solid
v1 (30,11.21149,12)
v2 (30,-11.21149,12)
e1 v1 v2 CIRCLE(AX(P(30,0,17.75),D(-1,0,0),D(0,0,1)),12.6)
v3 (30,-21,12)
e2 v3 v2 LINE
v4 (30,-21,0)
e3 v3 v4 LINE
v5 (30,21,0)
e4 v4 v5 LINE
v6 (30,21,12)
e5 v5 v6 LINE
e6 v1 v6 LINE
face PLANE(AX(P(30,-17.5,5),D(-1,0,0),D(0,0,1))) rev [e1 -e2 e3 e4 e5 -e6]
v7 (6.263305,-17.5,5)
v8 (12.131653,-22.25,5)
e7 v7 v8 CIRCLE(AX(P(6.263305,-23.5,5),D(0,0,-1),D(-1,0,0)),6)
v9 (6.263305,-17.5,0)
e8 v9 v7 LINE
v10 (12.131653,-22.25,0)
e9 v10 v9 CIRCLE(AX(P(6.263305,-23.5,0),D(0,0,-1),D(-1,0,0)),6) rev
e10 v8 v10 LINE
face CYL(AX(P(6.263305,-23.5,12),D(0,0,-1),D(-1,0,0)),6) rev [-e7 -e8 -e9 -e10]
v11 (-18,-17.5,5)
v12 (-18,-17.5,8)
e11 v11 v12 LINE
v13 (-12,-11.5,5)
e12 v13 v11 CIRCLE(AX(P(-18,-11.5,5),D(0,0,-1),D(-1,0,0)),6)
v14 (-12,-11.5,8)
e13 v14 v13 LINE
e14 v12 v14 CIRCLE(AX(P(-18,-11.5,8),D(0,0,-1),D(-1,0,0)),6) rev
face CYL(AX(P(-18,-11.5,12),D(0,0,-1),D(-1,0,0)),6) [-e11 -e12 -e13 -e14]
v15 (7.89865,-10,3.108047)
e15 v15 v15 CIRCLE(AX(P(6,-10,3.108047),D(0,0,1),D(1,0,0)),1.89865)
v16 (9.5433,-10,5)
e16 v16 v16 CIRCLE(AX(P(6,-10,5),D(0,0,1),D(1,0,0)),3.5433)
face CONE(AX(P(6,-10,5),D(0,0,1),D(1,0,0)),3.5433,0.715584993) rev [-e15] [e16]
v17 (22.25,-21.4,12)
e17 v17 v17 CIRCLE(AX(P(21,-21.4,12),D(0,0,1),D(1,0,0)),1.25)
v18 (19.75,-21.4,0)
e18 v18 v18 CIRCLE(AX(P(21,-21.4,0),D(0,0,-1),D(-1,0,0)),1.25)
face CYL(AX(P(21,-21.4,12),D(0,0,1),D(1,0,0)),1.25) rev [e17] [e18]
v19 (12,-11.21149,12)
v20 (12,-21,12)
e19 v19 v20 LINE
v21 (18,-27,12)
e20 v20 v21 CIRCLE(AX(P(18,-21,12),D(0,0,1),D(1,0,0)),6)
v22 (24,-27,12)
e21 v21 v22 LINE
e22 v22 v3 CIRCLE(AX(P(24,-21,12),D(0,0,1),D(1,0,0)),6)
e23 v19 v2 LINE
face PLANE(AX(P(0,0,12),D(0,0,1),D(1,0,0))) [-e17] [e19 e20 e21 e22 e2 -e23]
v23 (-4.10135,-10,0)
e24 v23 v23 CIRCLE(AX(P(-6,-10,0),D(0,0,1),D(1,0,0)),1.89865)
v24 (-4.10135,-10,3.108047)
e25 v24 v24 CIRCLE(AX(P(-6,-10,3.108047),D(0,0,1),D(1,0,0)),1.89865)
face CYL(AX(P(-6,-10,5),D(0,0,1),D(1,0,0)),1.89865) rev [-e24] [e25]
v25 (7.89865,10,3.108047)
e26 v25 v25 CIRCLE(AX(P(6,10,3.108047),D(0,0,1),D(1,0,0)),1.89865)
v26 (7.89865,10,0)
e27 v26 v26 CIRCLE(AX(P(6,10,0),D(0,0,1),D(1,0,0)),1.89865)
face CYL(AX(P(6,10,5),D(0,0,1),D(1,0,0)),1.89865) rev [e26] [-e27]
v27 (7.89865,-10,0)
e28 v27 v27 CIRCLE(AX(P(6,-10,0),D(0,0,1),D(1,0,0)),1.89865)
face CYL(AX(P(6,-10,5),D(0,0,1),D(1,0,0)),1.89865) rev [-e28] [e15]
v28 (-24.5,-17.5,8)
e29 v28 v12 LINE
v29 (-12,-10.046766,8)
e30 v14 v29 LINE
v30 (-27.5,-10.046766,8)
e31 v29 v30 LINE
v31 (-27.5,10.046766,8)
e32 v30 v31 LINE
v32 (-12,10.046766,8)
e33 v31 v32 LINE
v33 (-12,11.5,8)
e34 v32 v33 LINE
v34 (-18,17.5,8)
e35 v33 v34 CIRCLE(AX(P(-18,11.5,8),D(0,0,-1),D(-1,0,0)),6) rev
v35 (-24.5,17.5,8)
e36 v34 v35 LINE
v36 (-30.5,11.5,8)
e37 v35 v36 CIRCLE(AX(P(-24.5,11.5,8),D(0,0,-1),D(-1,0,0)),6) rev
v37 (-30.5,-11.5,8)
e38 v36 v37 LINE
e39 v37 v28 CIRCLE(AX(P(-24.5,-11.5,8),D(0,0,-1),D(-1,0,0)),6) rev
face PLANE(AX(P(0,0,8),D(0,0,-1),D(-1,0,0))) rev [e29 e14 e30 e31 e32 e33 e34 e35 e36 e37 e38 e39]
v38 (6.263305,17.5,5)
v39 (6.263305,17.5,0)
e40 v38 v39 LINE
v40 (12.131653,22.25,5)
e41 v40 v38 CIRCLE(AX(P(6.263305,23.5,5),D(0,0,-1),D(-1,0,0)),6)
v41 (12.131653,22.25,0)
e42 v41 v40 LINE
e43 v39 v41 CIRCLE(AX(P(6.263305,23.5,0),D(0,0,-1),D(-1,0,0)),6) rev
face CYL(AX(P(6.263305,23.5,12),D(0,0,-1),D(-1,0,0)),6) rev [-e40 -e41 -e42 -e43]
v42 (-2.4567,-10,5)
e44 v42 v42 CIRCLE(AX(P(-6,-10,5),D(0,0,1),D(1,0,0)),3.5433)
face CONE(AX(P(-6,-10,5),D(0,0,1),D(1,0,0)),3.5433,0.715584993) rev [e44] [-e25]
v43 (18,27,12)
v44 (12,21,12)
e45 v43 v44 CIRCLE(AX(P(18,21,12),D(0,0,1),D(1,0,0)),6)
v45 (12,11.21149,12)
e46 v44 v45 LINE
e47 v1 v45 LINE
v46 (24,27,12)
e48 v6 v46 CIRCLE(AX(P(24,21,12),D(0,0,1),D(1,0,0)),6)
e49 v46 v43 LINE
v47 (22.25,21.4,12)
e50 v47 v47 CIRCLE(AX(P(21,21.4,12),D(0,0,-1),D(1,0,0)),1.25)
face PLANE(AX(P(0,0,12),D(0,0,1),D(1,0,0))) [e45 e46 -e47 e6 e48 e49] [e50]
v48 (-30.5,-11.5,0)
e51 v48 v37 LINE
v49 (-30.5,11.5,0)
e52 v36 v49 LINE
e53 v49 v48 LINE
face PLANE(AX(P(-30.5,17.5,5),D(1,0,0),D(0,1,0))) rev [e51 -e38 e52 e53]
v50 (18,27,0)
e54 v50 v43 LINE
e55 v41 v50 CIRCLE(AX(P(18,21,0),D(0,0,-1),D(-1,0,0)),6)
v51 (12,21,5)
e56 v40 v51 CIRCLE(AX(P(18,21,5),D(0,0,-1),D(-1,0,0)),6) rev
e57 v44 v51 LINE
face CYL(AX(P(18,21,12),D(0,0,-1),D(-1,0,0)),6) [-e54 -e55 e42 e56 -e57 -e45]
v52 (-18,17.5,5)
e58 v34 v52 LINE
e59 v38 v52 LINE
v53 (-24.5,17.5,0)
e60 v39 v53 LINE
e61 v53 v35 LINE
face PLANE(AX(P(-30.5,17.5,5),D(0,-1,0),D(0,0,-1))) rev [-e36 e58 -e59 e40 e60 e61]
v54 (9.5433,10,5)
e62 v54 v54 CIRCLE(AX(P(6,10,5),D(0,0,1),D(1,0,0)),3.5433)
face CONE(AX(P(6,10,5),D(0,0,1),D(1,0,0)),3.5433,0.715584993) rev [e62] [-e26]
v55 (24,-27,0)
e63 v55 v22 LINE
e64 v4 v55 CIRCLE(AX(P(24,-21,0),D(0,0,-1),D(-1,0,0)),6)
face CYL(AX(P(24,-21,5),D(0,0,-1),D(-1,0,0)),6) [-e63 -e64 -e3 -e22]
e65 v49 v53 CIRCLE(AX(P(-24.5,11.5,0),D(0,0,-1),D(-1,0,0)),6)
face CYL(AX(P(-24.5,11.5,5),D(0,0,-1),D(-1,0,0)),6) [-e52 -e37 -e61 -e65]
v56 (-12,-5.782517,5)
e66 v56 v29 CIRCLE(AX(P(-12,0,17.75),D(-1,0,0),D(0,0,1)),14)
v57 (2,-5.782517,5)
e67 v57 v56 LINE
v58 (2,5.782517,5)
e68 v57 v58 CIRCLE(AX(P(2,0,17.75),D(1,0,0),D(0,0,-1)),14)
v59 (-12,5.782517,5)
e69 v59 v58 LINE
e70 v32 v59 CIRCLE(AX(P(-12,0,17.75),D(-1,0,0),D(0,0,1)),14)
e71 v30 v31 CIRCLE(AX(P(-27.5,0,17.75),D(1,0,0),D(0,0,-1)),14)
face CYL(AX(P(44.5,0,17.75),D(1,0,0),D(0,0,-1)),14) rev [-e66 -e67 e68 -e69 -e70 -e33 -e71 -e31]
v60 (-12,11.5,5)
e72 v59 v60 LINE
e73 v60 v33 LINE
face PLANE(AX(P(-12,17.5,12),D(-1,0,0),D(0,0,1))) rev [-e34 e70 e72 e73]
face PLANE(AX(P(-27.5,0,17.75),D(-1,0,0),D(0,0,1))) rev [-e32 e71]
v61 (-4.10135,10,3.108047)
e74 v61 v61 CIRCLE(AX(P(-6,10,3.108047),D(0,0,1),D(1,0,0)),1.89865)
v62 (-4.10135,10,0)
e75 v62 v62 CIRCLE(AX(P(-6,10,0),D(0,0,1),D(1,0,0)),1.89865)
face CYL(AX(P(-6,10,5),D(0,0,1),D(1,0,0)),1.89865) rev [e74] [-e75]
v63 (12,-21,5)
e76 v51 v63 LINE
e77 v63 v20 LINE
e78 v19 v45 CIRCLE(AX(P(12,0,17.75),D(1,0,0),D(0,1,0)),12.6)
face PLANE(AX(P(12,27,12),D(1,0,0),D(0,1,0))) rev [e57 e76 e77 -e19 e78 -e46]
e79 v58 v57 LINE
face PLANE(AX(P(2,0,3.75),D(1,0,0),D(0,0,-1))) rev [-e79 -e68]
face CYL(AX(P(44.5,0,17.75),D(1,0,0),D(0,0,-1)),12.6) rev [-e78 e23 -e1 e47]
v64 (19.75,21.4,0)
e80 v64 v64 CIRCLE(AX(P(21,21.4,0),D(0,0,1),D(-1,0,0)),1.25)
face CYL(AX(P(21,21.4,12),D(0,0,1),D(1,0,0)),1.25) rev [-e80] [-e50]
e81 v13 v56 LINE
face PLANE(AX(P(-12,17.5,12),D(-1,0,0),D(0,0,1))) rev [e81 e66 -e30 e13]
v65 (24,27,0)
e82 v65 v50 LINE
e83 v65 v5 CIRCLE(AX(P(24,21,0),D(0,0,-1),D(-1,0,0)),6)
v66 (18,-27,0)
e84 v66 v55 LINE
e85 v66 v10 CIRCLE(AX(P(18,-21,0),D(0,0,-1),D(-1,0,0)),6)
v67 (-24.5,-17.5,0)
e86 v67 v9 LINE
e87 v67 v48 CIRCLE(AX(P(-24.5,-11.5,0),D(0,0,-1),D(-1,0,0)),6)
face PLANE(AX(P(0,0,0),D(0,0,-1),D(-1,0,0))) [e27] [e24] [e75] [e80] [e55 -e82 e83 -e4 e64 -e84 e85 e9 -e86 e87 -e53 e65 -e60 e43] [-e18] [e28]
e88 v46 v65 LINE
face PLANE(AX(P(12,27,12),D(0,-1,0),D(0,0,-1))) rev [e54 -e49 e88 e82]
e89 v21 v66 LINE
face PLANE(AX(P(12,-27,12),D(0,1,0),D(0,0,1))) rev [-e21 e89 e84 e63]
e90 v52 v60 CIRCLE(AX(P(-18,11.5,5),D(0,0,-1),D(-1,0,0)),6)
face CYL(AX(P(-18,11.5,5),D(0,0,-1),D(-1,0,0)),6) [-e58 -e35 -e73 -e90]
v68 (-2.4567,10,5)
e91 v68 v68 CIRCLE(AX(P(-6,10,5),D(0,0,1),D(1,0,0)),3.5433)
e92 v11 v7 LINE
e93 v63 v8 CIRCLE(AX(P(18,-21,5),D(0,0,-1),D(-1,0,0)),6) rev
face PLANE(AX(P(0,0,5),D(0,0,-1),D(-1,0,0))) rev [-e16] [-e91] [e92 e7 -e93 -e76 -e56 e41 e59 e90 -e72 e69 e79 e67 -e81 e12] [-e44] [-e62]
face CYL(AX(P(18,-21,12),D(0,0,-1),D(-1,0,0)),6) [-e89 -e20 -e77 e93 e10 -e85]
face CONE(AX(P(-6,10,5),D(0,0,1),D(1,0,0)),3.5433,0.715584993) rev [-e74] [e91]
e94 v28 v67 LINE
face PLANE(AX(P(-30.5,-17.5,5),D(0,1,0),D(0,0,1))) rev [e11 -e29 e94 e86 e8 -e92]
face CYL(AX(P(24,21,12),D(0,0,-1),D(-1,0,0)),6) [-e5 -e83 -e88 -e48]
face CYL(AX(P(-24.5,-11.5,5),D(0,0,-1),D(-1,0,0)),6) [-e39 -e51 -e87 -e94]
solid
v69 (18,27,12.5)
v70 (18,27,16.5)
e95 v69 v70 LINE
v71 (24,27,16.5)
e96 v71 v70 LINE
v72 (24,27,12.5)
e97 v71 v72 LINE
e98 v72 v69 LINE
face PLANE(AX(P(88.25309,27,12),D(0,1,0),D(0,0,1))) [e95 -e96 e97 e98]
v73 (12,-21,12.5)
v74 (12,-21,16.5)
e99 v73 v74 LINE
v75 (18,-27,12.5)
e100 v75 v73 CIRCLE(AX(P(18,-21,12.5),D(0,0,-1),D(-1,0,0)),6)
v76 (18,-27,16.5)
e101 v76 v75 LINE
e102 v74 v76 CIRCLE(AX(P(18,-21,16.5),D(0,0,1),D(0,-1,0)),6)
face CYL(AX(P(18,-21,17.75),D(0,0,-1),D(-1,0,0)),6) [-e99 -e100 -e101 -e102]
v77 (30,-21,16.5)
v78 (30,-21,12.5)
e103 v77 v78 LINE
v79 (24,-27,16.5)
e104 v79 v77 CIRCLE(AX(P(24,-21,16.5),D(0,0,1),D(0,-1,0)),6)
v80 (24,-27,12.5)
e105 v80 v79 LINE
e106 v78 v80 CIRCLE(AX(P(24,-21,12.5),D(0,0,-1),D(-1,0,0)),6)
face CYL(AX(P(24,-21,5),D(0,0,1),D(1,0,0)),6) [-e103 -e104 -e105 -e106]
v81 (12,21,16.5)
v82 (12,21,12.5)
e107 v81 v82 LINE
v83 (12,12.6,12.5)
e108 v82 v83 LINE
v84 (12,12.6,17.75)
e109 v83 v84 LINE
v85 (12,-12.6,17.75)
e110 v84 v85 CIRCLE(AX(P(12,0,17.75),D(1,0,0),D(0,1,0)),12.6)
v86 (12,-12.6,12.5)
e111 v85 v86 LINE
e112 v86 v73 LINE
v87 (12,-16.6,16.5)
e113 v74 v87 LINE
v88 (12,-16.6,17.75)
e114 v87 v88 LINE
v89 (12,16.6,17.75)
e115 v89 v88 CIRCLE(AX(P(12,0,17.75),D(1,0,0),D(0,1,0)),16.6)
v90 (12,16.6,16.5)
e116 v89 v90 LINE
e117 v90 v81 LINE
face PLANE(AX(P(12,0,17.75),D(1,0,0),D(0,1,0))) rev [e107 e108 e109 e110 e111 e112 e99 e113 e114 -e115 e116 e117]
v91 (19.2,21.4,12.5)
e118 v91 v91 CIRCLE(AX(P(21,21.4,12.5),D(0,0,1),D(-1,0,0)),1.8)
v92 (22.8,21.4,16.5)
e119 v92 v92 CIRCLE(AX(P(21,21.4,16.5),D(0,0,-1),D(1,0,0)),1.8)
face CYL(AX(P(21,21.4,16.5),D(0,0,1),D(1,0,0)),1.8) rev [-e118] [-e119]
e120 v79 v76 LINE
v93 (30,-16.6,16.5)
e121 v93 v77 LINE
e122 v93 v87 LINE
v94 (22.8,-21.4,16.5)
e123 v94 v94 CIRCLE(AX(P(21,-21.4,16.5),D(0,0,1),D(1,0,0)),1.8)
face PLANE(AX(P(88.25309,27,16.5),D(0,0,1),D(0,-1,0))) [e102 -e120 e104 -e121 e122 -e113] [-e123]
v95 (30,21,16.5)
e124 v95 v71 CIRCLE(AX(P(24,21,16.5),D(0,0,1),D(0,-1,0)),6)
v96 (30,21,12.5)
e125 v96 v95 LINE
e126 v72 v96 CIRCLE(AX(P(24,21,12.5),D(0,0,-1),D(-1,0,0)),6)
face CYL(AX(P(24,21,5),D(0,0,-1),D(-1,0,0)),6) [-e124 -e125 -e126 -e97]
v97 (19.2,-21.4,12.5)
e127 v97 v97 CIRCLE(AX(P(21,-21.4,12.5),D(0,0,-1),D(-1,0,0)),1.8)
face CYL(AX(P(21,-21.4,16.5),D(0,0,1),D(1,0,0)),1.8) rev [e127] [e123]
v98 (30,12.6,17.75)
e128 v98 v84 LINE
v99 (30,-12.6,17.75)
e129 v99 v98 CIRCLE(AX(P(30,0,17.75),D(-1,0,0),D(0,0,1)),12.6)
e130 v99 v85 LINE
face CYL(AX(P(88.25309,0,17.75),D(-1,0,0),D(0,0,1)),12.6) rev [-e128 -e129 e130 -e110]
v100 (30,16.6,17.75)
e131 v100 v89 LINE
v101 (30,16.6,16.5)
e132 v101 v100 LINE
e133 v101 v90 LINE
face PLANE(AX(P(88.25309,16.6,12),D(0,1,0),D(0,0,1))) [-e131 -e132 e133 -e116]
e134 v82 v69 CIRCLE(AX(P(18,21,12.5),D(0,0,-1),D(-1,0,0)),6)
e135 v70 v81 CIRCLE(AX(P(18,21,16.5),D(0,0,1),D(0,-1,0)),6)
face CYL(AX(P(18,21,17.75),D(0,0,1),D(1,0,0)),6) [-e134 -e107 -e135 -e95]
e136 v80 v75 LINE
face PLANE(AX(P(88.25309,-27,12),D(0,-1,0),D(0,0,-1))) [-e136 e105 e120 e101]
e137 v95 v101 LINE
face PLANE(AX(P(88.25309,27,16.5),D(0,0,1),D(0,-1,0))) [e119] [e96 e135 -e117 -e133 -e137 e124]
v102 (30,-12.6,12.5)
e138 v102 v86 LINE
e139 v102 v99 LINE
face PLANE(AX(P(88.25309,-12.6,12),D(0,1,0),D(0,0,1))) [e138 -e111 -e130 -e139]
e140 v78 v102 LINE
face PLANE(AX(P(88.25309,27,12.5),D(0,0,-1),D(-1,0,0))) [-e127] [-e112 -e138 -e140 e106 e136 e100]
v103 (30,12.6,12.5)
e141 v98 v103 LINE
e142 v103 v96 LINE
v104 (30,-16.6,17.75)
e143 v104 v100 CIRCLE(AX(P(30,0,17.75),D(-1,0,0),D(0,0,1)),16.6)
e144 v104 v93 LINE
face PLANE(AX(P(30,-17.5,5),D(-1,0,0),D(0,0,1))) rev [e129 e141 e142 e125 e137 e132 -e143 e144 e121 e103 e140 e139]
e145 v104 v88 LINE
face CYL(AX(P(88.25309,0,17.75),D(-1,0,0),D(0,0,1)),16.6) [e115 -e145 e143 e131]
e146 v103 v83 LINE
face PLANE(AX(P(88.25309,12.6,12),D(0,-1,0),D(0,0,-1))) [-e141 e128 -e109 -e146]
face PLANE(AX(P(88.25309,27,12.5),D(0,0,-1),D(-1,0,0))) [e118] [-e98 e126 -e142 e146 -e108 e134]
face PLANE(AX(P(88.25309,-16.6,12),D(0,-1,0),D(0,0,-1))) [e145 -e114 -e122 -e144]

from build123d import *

# Parameters (mm, degrees)
BASE_SKETCH_W                        = 60.5
BASE_SKETCH_H                        = 35
BASE_EXTRUDE_DEPTH                   = 5
CRADLE_SKETCH_W                      = 18.5
CRADLE_SKETCH_H                      = 35
CRADLE_SKETCH_W_2                    = 18
CRADLE_SKETCH_H_2                    = 54
CRADLE_EXTRUDE_DEPTH                 = 12
NO_6_MOUNTING_HOLES_D                = 3.7973
NO_6_MOUNTING_HOLES_CSINK_D          = 7.0866
NO_6_MOUNTING_HOLES_CSINK_ANGLE      = 82
MOVE_START                           = 8
MOVE_FACE_OUTLINE_W                  = 18.5
MOVE_FACE_OUTLINE_H                  = 35
MOVE_FACE_DEPTH                      = 4
CLAMP_THREADED_HOLE_IN_BASE_D        = 2.5
CRADLE_FILLETS_R                     = 6
BASE_FILLETS_R                       = 6
MOTOR_START                          = 12
MOTOR_CLAMP_EXTRUDE_DEPTH            = 18
CLAMP_MOUNTING_HOLE_PROFILE_SKETCH_W = 1.8
CLAMP_MOUNTING_HOLE_PROFILE_SKETCH_H = 4
CLAMP_CORNER_FILLETS_R               = 6


# Read off the part's stored shape, not the designer's step: Move Face
with BuildPart() as part:
    # Base Sketch → Base Extrude (new body)
    with BuildSketch(Plane.XY):
        with Locations((-0.25, 0)):
            Rectangle(BASE_SKETCH_W, BASE_SKETCH_H)
    extrude(amount=BASE_EXTRUDE_DEPTH)

    # Cradle Sketch → Cradle Extrude (add)
    with BuildSketch(Plane.XY):
        with Locations((-21.25, 0)):
            Rectangle(CRADLE_SKETCH_W, CRADLE_SKETCH_H)
        with Locations((21, 0)):
            Rectangle(CRADLE_SKETCH_W_2, CRADLE_SKETCH_H_2)
    extrude(amount=CRADLE_EXTRUDE_DEPTH)

    # No. 6 Mounting Holes (through all)
    with Locations(Plane.XY.offset(5)):
        with Locations((-6, 10), (6, 10), (-6, -10), (6, -10)):
            CounterSinkHole(NO_6_MOUNTING_HOLES_D / 2, NO_6_MOUNTING_HOLES_CSINK_D / 2, counter_sink_angle=NO_6_MOUNTING_HOLES_CSINK_ANGLE)

    # Pump and Motor Revolve Cut Sketch → Pump and Motor Revolve Cut (revolve, cut)
    with BuildSketch(Plane(origin=(0, 0, 0), x_dir=(1, 0, 0), z_dir=(0, 1, 0))):
        Polygon((-27.5, -17.75), (-27.5, -3.75), (2, -3.75), (2, -5.15), (44.5, -5.15), (44.5, -17.75), align=None)
    revolve(axis=Axis((44.5, 0, 17.75), (-1, 0, 0)), mode=Mode.SUBTRACT)

    # Move Face outline → Move Face (cut)
    with BuildSketch(Plane.XY.offset(MOVE_START)):
        with Locations((-21.25, 0)):
            Rectangle(MOVE_FACE_OUTLINE_W, MOVE_FACE_OUTLINE_H)
    extrude(amount=MOVE_FACE_DEPTH, mode=Mode.SUBTRACT)

    # Clamp Threaded Hole in Base (through all)
    with Locations(Plane.XY.offset(12)):
        with Locations((21, -21.4)):
            clamp_threaded_hole_in_base = Hole(CLAMP_THREADED_HOLE_IN_BASE_D / 2)

    # Cradle Fillets
    cradle_fillets_edges = [part.edges().sort_by_distance(p)[0] for p in [
        (-12, -17.5, 6.5),
        (-12, 17.5, 6.5),
        (12, 27, 6),
        (30, -27, 6),
        (12, -27, 6),
        (30, 27, 6),
        (-30.5, -17.5, 4),
        (-30.5, 17.5, 4),
    ]]
    fillet(cradle_fillets_edges, radius=CRADLE_FILLETS_R)

    # Base Fillets
    # the kernel refuses this fillet: 6 mm, written as the material it adds along each edge
    with BuildSketch(Plane(origin=(12, 17.5, 5), x_dir=(0.027705718818601687, 0.9996161228915551, 0), z_dir=(0, 0, -1))) as base_fillets_piece_1:
        with BuildLine():
            CenterArc((5.83875749, -5.900726721), BASE_FILLETS_R, 100.437075268, 77.975300819)
            Line((-0.158939247, -5.734492409), (-0.758708921, -5.717868977))
            Line((-0.758708921, -5.717868977), (-0.599769674, 0.016623431))
            Line((-0.599769674, 0.016623431), (0.016623431, 0.599769674))
            ThreePointArc((0.016623431, 0.599769674), (3.515279861, 0.502799658), (4.643130779, 0.590072672))
            Line((4.643130779, 0.590072672), (4.751824117, 0))
        make_face()
    extrude(amount=5)
    with BuildSketch(Plane(origin=(12, -17.5, 0), x_dir=(-1, 0, 0), z_dir=(0, 0, 1))) as base_fillets_piece_2:
        with BuildLine():
            CenterArc((5.736694594, 6), BASE_FILLETS_R, 192.024699181, 77.975300819)
            Line((-0.131652703, 4.75), (-0.718487433, 4.625))
            ThreePointArc((-0.718487433, 4.625), (-0.6, 3.5), (-0.6, 0))
            Line((-0.6, 0), (0, -0.6))
            Line((0, -0.6), (5.736694594, -0.6))
            Line((5.736694594, -0.6), (5.736694594, 0))
        make_face()
    extrude(amount=5)


with BuildPart() as body_2:
    # Motor Clamp Sketch → Motor Clamp Extrude (new body)
    with BuildSketch(Plane(origin=(0, 0, 0), x_dir=(0, 0, -1), z_dir=(1, 0, 0)).offset(MOTOR_START)):
        with BuildLine():
            Line((-17.75, -16.6), (-16.5, -16.6))
            Line((-16.5, -16.6), (-16.5, -27))
            Line((-16.5, -27), (-12.5, -27))
            Line((-12.5, -27), (-12.5, -12.6))
            Line((-12.5, -12.6), (-17.75, -12.6))
            ThreePointArc((-17.75, -12.6), (-30.35, 0), (-17.75, 12.6))
            Line((-17.75, 12.6), (-12.5, 12.6))
            Line((-12.5, 12.6), (-12.5, 27))
            Line((-12.5, 27), (-16.5, 27))
            Line((-16.5, 27), (-16.5, 16.6))
            Line((-16.5, 16.6), (-17.75, 16.6))
            ThreePointArc((-17.75, 16.6), (-34.35, 0), (-17.75, -16.6))
        make_face()
    extrude(amount=MOTOR_CLAMP_EXTRUDE_DEPTH)

    # Clamp Mounting Hole Profile Sketch → Clamp Mounting Hole (revolve, cut)
    with BuildSketch(Plane(origin=(21, -21.4, 16.5), x_dir=(0, -1, 0), z_dir=(1, 0, 0))):
        with Locations((0.9, 2)):
            Rectangle(CLAMP_MOUNTING_HOLE_PROFILE_SKETCH_W, CLAMP_MOUNTING_HOLE_PROFILE_SKETCH_H)
    clamp_mounting_hole = revolve(axis=Axis((21, -21.4, 22.85), (0, 0, -1)), mode=Mode.SUBTRACT)


with BuildPart() as motor_clamp_screw_holes_mirror_tool:
    # Motor Clamp Screw Holes Mirror: Clamp Threaded Hole in Base, Clamp Mounting Hole across plane
    add(clamp_threaded_hole_in_base.mirror(Plane.ZX))
    add(clamp_mounting_hole.mirror(Plane.ZX))


with BuildPart() as part_1:
    add(part.part)

    # Motor Clamp Screw Holes Mirror: cut by motor_clamp_screw_holes_mirror_tool
    add(motor_clamp_screw_holes_mirror_tool.part, mode=Mode.SUBTRACT)


with BuildPart() as body_2_1:
    add(body_2.part)

    # Motor Clamp Screw Holes Mirror: cut by motor_clamp_screw_holes_mirror_tool
    add(motor_clamp_screw_holes_mirror_tool.part, mode=Mode.SUBTRACT)

    # Clamp Corner Fillets
    clamp_corner_fillets_edges = [body_2_1.edges().sort_by_distance(p)[0] for p in [
        (12, -27, 14.5),
        (12, 27, 14.5),
        (30, 27, 14.5),
        (30, -27, 14.5),
    ]]
    fillet(clamp_corner_fillets_edges, radius=CLAMP_CORNER_FILLETS_R)


solid = Compound([part_1.part, body_2_1.part])
